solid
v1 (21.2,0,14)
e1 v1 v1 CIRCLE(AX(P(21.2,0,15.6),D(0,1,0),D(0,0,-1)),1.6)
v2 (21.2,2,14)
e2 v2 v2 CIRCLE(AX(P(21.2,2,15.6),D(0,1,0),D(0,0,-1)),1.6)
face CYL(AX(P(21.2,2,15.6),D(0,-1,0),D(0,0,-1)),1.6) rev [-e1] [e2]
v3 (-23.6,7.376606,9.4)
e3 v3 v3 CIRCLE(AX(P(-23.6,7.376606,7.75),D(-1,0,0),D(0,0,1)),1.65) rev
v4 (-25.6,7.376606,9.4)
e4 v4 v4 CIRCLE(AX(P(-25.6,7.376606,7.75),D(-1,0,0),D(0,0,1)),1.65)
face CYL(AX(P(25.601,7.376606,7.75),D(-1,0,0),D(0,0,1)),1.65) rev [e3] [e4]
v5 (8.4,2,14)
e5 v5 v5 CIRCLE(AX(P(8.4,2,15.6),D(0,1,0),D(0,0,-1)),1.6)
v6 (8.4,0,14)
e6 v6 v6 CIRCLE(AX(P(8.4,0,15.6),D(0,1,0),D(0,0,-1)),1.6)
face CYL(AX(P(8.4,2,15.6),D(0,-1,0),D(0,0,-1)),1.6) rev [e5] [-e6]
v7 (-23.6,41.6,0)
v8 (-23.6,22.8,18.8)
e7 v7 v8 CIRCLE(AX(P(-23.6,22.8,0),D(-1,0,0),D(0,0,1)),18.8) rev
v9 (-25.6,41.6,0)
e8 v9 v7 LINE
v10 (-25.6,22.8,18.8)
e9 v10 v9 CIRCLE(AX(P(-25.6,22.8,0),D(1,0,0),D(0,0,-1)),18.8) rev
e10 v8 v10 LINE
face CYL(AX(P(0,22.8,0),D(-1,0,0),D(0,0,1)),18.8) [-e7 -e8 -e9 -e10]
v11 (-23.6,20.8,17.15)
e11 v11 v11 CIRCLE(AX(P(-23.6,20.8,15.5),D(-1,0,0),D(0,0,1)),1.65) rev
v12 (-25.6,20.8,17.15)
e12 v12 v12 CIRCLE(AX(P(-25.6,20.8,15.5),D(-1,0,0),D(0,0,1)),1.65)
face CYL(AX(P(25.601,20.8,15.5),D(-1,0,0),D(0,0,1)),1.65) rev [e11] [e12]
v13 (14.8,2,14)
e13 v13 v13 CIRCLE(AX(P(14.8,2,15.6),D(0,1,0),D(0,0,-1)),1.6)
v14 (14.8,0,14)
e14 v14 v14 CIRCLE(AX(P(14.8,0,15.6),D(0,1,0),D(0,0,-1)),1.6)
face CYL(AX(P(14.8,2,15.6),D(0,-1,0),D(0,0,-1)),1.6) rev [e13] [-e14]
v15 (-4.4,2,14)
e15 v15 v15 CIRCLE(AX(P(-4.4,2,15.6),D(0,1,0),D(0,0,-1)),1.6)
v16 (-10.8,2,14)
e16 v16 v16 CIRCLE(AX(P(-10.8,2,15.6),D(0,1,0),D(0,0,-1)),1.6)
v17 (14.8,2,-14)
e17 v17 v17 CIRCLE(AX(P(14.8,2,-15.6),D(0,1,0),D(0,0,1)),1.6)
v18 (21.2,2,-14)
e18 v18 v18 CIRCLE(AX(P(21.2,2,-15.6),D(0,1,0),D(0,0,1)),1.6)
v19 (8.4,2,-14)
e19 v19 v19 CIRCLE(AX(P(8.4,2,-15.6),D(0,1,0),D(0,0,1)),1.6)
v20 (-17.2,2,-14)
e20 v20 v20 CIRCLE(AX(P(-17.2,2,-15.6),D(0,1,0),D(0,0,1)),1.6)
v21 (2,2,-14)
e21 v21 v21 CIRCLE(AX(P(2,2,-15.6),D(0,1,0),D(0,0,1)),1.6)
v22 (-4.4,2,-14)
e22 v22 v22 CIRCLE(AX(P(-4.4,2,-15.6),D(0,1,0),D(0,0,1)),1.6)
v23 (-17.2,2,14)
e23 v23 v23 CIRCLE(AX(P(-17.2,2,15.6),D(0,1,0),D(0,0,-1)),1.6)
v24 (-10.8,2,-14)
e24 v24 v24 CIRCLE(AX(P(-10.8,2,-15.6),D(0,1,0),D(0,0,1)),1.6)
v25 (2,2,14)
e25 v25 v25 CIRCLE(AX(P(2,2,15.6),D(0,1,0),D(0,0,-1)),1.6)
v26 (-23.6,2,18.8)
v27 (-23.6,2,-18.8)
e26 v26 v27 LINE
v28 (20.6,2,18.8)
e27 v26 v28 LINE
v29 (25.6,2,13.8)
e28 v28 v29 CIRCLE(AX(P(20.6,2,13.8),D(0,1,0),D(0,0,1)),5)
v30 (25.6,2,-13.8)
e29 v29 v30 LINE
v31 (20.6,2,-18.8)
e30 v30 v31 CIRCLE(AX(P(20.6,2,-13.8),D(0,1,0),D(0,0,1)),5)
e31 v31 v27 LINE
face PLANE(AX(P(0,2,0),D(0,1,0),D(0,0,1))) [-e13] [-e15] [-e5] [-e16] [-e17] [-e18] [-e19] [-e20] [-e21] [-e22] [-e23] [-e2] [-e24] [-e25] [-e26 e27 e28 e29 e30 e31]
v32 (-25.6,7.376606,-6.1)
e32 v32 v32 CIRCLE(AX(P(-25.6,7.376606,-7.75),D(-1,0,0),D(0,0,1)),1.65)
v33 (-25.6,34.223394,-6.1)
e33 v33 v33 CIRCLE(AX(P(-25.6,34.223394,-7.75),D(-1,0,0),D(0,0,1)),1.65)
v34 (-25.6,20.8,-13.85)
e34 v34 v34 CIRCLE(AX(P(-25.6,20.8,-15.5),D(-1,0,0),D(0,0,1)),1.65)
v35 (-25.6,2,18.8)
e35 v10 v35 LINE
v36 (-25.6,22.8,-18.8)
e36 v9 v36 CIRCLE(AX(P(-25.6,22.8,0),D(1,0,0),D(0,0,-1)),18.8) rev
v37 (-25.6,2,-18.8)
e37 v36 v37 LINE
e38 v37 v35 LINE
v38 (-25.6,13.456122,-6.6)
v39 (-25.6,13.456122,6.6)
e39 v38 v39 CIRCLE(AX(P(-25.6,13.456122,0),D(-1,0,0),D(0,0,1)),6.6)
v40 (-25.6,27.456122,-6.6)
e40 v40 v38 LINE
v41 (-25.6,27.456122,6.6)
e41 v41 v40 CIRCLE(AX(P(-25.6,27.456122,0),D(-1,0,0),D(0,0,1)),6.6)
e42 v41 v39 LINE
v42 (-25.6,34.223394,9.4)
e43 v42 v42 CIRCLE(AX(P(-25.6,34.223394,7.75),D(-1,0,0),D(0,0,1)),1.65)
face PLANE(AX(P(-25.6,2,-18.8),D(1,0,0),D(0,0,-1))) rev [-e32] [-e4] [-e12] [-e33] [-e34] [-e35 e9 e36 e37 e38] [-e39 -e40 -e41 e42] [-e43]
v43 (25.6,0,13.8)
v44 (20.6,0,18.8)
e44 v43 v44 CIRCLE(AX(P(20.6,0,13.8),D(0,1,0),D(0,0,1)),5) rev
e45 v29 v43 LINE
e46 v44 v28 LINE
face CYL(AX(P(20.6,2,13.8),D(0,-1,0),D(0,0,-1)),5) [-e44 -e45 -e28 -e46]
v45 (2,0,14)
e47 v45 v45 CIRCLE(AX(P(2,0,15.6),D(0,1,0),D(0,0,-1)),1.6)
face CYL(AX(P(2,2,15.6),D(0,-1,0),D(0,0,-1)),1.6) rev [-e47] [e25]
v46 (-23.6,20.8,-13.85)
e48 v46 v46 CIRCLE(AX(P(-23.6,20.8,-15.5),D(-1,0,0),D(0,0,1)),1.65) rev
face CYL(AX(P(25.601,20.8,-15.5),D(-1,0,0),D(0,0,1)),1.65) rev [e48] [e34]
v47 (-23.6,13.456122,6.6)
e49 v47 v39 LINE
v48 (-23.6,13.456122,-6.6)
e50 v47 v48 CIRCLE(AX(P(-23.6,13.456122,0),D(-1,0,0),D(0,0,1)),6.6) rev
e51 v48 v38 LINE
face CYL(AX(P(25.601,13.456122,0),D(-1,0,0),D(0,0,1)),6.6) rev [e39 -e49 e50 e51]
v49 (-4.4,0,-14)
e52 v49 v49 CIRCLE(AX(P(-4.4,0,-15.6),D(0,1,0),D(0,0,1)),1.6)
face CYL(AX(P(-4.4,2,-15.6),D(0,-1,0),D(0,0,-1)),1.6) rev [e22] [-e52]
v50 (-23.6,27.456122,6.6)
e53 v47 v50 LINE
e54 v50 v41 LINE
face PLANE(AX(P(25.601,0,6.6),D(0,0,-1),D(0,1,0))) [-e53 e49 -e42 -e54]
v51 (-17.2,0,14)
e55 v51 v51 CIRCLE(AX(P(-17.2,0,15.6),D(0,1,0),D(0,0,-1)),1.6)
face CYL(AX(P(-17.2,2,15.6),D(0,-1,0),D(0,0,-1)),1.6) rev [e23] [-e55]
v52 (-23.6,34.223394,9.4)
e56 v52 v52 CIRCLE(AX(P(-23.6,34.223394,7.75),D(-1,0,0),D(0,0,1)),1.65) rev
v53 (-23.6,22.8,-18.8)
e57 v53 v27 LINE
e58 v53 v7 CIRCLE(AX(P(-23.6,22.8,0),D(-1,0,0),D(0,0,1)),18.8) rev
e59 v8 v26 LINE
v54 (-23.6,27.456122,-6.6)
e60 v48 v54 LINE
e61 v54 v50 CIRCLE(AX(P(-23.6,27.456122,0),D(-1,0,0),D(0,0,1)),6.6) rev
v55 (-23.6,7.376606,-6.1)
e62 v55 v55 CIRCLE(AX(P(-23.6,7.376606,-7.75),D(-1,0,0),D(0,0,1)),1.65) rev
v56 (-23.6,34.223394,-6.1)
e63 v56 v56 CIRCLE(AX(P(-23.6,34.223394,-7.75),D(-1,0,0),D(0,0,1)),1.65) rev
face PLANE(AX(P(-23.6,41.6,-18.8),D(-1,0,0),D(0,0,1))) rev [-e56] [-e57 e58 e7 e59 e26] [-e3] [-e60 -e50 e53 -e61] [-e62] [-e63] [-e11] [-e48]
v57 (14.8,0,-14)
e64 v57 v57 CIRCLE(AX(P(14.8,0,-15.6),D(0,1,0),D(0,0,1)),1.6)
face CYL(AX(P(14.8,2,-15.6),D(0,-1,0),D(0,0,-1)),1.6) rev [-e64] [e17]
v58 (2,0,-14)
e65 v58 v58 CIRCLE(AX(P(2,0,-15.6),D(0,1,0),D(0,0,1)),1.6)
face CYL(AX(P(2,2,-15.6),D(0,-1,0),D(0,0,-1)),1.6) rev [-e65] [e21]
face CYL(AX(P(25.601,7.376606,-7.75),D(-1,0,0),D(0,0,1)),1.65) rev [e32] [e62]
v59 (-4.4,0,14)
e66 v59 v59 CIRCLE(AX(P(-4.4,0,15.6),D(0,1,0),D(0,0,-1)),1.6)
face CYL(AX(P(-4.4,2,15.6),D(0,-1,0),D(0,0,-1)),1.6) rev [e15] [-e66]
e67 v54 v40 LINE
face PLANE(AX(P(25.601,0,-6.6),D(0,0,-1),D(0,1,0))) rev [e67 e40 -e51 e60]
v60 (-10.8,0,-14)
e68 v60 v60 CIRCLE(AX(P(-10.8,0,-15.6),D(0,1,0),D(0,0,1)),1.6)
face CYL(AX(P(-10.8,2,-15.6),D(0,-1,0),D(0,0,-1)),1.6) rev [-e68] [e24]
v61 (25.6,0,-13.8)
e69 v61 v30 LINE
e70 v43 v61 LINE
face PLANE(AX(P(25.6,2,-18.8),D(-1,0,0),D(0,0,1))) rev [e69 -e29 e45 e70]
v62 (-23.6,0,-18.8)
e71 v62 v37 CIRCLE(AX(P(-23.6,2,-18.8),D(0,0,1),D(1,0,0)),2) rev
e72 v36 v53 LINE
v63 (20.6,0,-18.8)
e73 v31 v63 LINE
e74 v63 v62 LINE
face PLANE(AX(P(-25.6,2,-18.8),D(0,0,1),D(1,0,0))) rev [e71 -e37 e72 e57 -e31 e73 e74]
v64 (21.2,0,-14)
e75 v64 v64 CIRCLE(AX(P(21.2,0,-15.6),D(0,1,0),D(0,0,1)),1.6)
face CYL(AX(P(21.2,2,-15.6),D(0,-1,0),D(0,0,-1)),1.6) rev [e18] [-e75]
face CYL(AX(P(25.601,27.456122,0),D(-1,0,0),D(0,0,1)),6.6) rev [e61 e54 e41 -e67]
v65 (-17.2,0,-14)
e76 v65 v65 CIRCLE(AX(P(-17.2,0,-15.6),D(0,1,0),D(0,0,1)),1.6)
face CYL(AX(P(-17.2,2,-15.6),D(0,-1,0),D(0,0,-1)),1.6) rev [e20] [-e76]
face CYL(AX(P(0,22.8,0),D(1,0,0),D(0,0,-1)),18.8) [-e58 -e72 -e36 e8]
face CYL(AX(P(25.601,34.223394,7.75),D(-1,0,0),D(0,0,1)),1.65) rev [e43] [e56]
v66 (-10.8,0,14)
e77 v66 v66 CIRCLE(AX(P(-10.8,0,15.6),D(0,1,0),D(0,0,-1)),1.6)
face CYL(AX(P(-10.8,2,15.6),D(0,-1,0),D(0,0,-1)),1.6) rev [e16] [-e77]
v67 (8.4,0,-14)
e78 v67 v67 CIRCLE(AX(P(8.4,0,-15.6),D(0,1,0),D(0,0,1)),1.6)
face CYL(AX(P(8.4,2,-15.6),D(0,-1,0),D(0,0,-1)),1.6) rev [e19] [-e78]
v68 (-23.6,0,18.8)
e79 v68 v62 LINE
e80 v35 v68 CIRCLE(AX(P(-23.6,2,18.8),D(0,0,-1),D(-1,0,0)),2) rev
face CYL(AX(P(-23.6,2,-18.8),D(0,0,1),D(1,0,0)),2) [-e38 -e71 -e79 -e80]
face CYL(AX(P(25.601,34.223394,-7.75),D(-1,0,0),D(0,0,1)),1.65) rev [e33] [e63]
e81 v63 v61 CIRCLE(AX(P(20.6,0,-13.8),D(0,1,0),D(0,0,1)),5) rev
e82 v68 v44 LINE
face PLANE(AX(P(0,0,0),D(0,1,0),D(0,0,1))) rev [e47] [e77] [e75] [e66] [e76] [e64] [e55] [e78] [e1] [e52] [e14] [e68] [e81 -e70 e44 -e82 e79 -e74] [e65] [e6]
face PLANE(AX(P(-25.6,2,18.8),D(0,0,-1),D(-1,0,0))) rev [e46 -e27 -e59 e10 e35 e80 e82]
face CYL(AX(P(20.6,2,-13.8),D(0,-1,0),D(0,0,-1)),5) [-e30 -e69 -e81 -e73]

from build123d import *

# Parameters (mm, degrees)
SKETCH1_W           = 51.2
SKETCH1_H           = 37.6
SKETCH1_R           = 1.6
BOSS_EXTRUDE1_DEPTH = 2
FILLET2_R           = 5
SKETCH2_W           = 2
SKETCH2_H           = 37.6
BOSS_EXTRUDE2_DEPTH = 39.6
CUT_EXTRUDE1_REACH  = 70.596
SKETCH3_R           = 1.65
FILLET3_R           = 18.8
FILLET4_R           = 2


with BuildPart() as part:
    # Sketch1 → Boss-Extrude1 (new body)
    with BuildSketch(Plane(origin=(0, 0, 0), x_dir=(1, 0, 0), z_dir=(0, 1, 0))):
        Rectangle(SKETCH1_W, SKETCH1_H)
        with Locations(Location((-17.2, 15.6, 0), (0, 0, 270))):
            Circle(SKETCH1_R, mode=Mode.SUBTRACT)
        with Locations(Location((-10.8, 15.6, 0), (0, 0, 270))):
            Circle(SKETCH1_R, mode=Mode.SUBTRACT)
        with Locations(Location((-4.4, 15.6, 0), (0, 0, 270))):
            Circle(SKETCH1_R, mode=Mode.SUBTRACT)
        with Locations(Location((2, 15.6, 0), (0, 0, 270))):
            Circle(SKETCH1_R, mode=Mode.SUBTRACT)
        with Locations(Location((8.4, 15.6, 0), (0, 0, 270))):
            Circle(SKETCH1_R, mode=Mode.SUBTRACT)
        with Locations(Location((14.8, 15.6, 0), (0, 0, 270))):
            Circle(SKETCH1_R, mode=Mode.SUBTRACT)
        with Locations(Location((21.2, 15.6, 0), (0, 0, 270))):
            Circle(SKETCH1_R, mode=Mode.SUBTRACT)
        with Locations(Location((21.2, -15.6, 0), (0, 0, 90))):
            Circle(SKETCH1_R, mode=Mode.SUBTRACT)
        with Locations(Location((14.8, -15.6, 0), (0, 0, 90))):
            Circle(SKETCH1_R, mode=Mode.SUBTRACT)
        with Locations(Location((8.4, -15.6, 0), (0, 0, 90))):
            Circle(SKETCH1_R, mode=Mode.SUBTRACT)
        with Locations(Location((2, -15.6, 0), (0, 0, 90))):
            Circle(SKETCH1_R, mode=Mode.SUBTRACT)
        with Locations(Location((-4.4, -15.6, 0), (0, 0, 90))):
            Circle(SKETCH1_R, mode=Mode.SUBTRACT)
        with Locations(Location((-10.8, -15.6, 0), (0, 0, 90))):
            Circle(SKETCH1_R, mode=Mode.SUBTRACT)
        with Locations(Location((-17.2, -15.6, 0), (0, 0, 90))):
            Circle(SKETCH1_R, mode=Mode.SUBTRACT)
    extrude(amount=BOSS_EXTRUDE1_DEPTH)

    # Fillet2
    fillet2_edges = [part.edges().sort_by_distance(p)[0] for p in [
        (25.6, 1, 18.8),
        (25.6, 1, -18.8),
    ]]
    fillet(fillet2_edges, radius=FILLET2_R)

    # Sketch2 → Boss-Extrude2 (add)
    with BuildSketch(Plane(origin=(0, 2, 0), x_dir=(1, 0, 0), z_dir=(0, 1, 0))):
        with Locations((-24.6, 0)):
            Rectangle(SKETCH2_W, SKETCH2_H)
    extrude(amount=BOSS_EXTRUDE2_DEPTH)

    # Sketch3 → Cut-Extrude1 (cut, up to next)
    with BuildSketch(Plane.ZY.offset(25.6), mode=Mode.PRIVATE) as cut_extrude1_sk1:
        with Locations((7.75, 34.223393759)):
            Circle(SKETCH3_R)
    cut_extrude1_tool1 = extrude(cut_extrude1_sk1.sketch, amount=-CUT_EXTRUDE1_REACH, mode=Mode.PRIVATE) & part.part
    # Sketch3 → Cut-Extrude1 (cut, up to next)
    with BuildSketch(Plane.ZY.offset(25.6), mode=Mode.PRIVATE) as cut_extrude1_sk2:
        with Locations((15.5, 20.8)):
            Circle(SKETCH3_R)
    cut_extrude1_tool2 = extrude(cut_extrude1_sk2.sketch, amount=-CUT_EXTRUDE1_REACH, mode=Mode.PRIVATE) & part.part
    # Sketch3 → Cut-Extrude1 (cut, up to next)
    with BuildSketch(Plane.ZY.offset(25.6), mode=Mode.PRIVATE) as cut_extrude1_sk3:
        with Locations((7.75, 7.376606241)):
            Circle(SKETCH3_R)
    cut_extrude1_tool3 = extrude(cut_extrude1_sk3.sketch, amount=-CUT_EXTRUDE1_REACH, mode=Mode.PRIVATE) & part.part
    # Sketch3 → Cut-Extrude1 (cut, up to next)
    with BuildSketch(Plane.ZY.offset(25.6), mode=Mode.PRIVATE) as cut_extrude1_sk4:
        with Locations((-7.75, 7.376606241)):
            Circle(SKETCH3_R)
    cut_extrude1_tool4 = extrude(cut_extrude1_sk4.sketch, amount=-CUT_EXTRUDE1_REACH, mode=Mode.PRIVATE) & part.part
    # Sketch3 → Cut-Extrude1 (cut, up to next)
    with BuildSketch(Plane.ZY.offset(25.6), mode=Mode.PRIVATE) as cut_extrude1_sk5:
        with Locations((-15.5, 20.8)):
            Circle(SKETCH3_R)
    cut_extrude1_tool5 = extrude(cut_extrude1_sk5.sketch, amount=-CUT_EXTRUDE1_REACH, mode=Mode.PRIVATE) & part.part
    # Sketch3 → Cut-Extrude1 (cut, up to next)
    with BuildSketch(Plane.ZY.offset(25.6), mode=Mode.PRIVATE) as cut_extrude1_sk6:
        with Locations((-7.75, 34.223393759)):
            Circle(SKETCH3_R)
    cut_extrude1_tool6 = extrude(cut_extrude1_sk6.sketch, amount=-CUT_EXTRUDE1_REACH, mode=Mode.PRIVATE) & part.part
    # Sketch3 → Cut-Extrude1 (cut, up to next)
    with BuildSketch(Plane.ZY.offset(25.6), mode=Mode.PRIVATE) as cut_extrude1_sk7:
        with BuildLine():
            Line((-6.6, 27.456121665), (-6.6, 13.456121665))
            ThreePointArc((-6.6, 13.456121665), (0, 6.856121665), (6.6, 13.456121665))
            Line((6.6, 13.456121665), (6.6, 27.456121665))
            ThreePointArc((6.6, 27.456121665), (0, 34.056121665), (-6.6, 27.456121665))
        make_face()
    cut_extrude1_tool7 = extrude(cut_extrude1_sk7.sketch, amount=-CUT_EXTRUDE1_REACH, mode=Mode.PRIVATE) & part.part
    add(cut_extrude1_tool1.solids().sort_by_distance((-25.6, 34.223394, 7.75))[0], mode=Mode.SUBTRACT)
    add(cut_extrude1_tool2.solids().sort_by_distance((-25.6, 20.8, 15.5))[0], mode=Mode.SUBTRACT)
    add(cut_extrude1_tool3.solids().sort_by_distance((-25.6, 7.376606, 7.75))[0], mode=Mode.SUBTRACT)
    add(cut_extrude1_tool4.solids().sort_by_distance((-25.6, 7.376606, -7.75))[0], mode=Mode.SUBTRACT)
    add(cut_extrude1_tool5.solids().sort_by_distance((-25.6, 20.8, -15.5))[0], mode=Mode.SUBTRACT)
    add(cut_extrude1_tool6.solids().sort_by_distance((-25.6, 34.223394, -7.75))[0], mode=Mode.SUBTRACT)
    add(cut_extrude1_tool7.solids().sort_by_distance((-25.6, 20.456122, 0))[0], mode=Mode.SUBTRACT)

    # Fillet3
    fillet3_edges = [part.edges().sort_by_distance(p)[0] for p in [
        (-24.6, 41.6, -18.8),
        (-24.6, 41.6, 18.8),
    ]]
    fillet(fillet3_edges, radius=FILLET3_R - 0.0001)  # a hair under: the kernel refuses the full size

    # Fillet4
    fillet4_edges = [part.edges().sort_by_distance(p)[0] for p in [
        (-25.6, 0, 0),
    ]]
    fillet(fillet4_edges, radius=FILLET4_R)


solid = part.part
